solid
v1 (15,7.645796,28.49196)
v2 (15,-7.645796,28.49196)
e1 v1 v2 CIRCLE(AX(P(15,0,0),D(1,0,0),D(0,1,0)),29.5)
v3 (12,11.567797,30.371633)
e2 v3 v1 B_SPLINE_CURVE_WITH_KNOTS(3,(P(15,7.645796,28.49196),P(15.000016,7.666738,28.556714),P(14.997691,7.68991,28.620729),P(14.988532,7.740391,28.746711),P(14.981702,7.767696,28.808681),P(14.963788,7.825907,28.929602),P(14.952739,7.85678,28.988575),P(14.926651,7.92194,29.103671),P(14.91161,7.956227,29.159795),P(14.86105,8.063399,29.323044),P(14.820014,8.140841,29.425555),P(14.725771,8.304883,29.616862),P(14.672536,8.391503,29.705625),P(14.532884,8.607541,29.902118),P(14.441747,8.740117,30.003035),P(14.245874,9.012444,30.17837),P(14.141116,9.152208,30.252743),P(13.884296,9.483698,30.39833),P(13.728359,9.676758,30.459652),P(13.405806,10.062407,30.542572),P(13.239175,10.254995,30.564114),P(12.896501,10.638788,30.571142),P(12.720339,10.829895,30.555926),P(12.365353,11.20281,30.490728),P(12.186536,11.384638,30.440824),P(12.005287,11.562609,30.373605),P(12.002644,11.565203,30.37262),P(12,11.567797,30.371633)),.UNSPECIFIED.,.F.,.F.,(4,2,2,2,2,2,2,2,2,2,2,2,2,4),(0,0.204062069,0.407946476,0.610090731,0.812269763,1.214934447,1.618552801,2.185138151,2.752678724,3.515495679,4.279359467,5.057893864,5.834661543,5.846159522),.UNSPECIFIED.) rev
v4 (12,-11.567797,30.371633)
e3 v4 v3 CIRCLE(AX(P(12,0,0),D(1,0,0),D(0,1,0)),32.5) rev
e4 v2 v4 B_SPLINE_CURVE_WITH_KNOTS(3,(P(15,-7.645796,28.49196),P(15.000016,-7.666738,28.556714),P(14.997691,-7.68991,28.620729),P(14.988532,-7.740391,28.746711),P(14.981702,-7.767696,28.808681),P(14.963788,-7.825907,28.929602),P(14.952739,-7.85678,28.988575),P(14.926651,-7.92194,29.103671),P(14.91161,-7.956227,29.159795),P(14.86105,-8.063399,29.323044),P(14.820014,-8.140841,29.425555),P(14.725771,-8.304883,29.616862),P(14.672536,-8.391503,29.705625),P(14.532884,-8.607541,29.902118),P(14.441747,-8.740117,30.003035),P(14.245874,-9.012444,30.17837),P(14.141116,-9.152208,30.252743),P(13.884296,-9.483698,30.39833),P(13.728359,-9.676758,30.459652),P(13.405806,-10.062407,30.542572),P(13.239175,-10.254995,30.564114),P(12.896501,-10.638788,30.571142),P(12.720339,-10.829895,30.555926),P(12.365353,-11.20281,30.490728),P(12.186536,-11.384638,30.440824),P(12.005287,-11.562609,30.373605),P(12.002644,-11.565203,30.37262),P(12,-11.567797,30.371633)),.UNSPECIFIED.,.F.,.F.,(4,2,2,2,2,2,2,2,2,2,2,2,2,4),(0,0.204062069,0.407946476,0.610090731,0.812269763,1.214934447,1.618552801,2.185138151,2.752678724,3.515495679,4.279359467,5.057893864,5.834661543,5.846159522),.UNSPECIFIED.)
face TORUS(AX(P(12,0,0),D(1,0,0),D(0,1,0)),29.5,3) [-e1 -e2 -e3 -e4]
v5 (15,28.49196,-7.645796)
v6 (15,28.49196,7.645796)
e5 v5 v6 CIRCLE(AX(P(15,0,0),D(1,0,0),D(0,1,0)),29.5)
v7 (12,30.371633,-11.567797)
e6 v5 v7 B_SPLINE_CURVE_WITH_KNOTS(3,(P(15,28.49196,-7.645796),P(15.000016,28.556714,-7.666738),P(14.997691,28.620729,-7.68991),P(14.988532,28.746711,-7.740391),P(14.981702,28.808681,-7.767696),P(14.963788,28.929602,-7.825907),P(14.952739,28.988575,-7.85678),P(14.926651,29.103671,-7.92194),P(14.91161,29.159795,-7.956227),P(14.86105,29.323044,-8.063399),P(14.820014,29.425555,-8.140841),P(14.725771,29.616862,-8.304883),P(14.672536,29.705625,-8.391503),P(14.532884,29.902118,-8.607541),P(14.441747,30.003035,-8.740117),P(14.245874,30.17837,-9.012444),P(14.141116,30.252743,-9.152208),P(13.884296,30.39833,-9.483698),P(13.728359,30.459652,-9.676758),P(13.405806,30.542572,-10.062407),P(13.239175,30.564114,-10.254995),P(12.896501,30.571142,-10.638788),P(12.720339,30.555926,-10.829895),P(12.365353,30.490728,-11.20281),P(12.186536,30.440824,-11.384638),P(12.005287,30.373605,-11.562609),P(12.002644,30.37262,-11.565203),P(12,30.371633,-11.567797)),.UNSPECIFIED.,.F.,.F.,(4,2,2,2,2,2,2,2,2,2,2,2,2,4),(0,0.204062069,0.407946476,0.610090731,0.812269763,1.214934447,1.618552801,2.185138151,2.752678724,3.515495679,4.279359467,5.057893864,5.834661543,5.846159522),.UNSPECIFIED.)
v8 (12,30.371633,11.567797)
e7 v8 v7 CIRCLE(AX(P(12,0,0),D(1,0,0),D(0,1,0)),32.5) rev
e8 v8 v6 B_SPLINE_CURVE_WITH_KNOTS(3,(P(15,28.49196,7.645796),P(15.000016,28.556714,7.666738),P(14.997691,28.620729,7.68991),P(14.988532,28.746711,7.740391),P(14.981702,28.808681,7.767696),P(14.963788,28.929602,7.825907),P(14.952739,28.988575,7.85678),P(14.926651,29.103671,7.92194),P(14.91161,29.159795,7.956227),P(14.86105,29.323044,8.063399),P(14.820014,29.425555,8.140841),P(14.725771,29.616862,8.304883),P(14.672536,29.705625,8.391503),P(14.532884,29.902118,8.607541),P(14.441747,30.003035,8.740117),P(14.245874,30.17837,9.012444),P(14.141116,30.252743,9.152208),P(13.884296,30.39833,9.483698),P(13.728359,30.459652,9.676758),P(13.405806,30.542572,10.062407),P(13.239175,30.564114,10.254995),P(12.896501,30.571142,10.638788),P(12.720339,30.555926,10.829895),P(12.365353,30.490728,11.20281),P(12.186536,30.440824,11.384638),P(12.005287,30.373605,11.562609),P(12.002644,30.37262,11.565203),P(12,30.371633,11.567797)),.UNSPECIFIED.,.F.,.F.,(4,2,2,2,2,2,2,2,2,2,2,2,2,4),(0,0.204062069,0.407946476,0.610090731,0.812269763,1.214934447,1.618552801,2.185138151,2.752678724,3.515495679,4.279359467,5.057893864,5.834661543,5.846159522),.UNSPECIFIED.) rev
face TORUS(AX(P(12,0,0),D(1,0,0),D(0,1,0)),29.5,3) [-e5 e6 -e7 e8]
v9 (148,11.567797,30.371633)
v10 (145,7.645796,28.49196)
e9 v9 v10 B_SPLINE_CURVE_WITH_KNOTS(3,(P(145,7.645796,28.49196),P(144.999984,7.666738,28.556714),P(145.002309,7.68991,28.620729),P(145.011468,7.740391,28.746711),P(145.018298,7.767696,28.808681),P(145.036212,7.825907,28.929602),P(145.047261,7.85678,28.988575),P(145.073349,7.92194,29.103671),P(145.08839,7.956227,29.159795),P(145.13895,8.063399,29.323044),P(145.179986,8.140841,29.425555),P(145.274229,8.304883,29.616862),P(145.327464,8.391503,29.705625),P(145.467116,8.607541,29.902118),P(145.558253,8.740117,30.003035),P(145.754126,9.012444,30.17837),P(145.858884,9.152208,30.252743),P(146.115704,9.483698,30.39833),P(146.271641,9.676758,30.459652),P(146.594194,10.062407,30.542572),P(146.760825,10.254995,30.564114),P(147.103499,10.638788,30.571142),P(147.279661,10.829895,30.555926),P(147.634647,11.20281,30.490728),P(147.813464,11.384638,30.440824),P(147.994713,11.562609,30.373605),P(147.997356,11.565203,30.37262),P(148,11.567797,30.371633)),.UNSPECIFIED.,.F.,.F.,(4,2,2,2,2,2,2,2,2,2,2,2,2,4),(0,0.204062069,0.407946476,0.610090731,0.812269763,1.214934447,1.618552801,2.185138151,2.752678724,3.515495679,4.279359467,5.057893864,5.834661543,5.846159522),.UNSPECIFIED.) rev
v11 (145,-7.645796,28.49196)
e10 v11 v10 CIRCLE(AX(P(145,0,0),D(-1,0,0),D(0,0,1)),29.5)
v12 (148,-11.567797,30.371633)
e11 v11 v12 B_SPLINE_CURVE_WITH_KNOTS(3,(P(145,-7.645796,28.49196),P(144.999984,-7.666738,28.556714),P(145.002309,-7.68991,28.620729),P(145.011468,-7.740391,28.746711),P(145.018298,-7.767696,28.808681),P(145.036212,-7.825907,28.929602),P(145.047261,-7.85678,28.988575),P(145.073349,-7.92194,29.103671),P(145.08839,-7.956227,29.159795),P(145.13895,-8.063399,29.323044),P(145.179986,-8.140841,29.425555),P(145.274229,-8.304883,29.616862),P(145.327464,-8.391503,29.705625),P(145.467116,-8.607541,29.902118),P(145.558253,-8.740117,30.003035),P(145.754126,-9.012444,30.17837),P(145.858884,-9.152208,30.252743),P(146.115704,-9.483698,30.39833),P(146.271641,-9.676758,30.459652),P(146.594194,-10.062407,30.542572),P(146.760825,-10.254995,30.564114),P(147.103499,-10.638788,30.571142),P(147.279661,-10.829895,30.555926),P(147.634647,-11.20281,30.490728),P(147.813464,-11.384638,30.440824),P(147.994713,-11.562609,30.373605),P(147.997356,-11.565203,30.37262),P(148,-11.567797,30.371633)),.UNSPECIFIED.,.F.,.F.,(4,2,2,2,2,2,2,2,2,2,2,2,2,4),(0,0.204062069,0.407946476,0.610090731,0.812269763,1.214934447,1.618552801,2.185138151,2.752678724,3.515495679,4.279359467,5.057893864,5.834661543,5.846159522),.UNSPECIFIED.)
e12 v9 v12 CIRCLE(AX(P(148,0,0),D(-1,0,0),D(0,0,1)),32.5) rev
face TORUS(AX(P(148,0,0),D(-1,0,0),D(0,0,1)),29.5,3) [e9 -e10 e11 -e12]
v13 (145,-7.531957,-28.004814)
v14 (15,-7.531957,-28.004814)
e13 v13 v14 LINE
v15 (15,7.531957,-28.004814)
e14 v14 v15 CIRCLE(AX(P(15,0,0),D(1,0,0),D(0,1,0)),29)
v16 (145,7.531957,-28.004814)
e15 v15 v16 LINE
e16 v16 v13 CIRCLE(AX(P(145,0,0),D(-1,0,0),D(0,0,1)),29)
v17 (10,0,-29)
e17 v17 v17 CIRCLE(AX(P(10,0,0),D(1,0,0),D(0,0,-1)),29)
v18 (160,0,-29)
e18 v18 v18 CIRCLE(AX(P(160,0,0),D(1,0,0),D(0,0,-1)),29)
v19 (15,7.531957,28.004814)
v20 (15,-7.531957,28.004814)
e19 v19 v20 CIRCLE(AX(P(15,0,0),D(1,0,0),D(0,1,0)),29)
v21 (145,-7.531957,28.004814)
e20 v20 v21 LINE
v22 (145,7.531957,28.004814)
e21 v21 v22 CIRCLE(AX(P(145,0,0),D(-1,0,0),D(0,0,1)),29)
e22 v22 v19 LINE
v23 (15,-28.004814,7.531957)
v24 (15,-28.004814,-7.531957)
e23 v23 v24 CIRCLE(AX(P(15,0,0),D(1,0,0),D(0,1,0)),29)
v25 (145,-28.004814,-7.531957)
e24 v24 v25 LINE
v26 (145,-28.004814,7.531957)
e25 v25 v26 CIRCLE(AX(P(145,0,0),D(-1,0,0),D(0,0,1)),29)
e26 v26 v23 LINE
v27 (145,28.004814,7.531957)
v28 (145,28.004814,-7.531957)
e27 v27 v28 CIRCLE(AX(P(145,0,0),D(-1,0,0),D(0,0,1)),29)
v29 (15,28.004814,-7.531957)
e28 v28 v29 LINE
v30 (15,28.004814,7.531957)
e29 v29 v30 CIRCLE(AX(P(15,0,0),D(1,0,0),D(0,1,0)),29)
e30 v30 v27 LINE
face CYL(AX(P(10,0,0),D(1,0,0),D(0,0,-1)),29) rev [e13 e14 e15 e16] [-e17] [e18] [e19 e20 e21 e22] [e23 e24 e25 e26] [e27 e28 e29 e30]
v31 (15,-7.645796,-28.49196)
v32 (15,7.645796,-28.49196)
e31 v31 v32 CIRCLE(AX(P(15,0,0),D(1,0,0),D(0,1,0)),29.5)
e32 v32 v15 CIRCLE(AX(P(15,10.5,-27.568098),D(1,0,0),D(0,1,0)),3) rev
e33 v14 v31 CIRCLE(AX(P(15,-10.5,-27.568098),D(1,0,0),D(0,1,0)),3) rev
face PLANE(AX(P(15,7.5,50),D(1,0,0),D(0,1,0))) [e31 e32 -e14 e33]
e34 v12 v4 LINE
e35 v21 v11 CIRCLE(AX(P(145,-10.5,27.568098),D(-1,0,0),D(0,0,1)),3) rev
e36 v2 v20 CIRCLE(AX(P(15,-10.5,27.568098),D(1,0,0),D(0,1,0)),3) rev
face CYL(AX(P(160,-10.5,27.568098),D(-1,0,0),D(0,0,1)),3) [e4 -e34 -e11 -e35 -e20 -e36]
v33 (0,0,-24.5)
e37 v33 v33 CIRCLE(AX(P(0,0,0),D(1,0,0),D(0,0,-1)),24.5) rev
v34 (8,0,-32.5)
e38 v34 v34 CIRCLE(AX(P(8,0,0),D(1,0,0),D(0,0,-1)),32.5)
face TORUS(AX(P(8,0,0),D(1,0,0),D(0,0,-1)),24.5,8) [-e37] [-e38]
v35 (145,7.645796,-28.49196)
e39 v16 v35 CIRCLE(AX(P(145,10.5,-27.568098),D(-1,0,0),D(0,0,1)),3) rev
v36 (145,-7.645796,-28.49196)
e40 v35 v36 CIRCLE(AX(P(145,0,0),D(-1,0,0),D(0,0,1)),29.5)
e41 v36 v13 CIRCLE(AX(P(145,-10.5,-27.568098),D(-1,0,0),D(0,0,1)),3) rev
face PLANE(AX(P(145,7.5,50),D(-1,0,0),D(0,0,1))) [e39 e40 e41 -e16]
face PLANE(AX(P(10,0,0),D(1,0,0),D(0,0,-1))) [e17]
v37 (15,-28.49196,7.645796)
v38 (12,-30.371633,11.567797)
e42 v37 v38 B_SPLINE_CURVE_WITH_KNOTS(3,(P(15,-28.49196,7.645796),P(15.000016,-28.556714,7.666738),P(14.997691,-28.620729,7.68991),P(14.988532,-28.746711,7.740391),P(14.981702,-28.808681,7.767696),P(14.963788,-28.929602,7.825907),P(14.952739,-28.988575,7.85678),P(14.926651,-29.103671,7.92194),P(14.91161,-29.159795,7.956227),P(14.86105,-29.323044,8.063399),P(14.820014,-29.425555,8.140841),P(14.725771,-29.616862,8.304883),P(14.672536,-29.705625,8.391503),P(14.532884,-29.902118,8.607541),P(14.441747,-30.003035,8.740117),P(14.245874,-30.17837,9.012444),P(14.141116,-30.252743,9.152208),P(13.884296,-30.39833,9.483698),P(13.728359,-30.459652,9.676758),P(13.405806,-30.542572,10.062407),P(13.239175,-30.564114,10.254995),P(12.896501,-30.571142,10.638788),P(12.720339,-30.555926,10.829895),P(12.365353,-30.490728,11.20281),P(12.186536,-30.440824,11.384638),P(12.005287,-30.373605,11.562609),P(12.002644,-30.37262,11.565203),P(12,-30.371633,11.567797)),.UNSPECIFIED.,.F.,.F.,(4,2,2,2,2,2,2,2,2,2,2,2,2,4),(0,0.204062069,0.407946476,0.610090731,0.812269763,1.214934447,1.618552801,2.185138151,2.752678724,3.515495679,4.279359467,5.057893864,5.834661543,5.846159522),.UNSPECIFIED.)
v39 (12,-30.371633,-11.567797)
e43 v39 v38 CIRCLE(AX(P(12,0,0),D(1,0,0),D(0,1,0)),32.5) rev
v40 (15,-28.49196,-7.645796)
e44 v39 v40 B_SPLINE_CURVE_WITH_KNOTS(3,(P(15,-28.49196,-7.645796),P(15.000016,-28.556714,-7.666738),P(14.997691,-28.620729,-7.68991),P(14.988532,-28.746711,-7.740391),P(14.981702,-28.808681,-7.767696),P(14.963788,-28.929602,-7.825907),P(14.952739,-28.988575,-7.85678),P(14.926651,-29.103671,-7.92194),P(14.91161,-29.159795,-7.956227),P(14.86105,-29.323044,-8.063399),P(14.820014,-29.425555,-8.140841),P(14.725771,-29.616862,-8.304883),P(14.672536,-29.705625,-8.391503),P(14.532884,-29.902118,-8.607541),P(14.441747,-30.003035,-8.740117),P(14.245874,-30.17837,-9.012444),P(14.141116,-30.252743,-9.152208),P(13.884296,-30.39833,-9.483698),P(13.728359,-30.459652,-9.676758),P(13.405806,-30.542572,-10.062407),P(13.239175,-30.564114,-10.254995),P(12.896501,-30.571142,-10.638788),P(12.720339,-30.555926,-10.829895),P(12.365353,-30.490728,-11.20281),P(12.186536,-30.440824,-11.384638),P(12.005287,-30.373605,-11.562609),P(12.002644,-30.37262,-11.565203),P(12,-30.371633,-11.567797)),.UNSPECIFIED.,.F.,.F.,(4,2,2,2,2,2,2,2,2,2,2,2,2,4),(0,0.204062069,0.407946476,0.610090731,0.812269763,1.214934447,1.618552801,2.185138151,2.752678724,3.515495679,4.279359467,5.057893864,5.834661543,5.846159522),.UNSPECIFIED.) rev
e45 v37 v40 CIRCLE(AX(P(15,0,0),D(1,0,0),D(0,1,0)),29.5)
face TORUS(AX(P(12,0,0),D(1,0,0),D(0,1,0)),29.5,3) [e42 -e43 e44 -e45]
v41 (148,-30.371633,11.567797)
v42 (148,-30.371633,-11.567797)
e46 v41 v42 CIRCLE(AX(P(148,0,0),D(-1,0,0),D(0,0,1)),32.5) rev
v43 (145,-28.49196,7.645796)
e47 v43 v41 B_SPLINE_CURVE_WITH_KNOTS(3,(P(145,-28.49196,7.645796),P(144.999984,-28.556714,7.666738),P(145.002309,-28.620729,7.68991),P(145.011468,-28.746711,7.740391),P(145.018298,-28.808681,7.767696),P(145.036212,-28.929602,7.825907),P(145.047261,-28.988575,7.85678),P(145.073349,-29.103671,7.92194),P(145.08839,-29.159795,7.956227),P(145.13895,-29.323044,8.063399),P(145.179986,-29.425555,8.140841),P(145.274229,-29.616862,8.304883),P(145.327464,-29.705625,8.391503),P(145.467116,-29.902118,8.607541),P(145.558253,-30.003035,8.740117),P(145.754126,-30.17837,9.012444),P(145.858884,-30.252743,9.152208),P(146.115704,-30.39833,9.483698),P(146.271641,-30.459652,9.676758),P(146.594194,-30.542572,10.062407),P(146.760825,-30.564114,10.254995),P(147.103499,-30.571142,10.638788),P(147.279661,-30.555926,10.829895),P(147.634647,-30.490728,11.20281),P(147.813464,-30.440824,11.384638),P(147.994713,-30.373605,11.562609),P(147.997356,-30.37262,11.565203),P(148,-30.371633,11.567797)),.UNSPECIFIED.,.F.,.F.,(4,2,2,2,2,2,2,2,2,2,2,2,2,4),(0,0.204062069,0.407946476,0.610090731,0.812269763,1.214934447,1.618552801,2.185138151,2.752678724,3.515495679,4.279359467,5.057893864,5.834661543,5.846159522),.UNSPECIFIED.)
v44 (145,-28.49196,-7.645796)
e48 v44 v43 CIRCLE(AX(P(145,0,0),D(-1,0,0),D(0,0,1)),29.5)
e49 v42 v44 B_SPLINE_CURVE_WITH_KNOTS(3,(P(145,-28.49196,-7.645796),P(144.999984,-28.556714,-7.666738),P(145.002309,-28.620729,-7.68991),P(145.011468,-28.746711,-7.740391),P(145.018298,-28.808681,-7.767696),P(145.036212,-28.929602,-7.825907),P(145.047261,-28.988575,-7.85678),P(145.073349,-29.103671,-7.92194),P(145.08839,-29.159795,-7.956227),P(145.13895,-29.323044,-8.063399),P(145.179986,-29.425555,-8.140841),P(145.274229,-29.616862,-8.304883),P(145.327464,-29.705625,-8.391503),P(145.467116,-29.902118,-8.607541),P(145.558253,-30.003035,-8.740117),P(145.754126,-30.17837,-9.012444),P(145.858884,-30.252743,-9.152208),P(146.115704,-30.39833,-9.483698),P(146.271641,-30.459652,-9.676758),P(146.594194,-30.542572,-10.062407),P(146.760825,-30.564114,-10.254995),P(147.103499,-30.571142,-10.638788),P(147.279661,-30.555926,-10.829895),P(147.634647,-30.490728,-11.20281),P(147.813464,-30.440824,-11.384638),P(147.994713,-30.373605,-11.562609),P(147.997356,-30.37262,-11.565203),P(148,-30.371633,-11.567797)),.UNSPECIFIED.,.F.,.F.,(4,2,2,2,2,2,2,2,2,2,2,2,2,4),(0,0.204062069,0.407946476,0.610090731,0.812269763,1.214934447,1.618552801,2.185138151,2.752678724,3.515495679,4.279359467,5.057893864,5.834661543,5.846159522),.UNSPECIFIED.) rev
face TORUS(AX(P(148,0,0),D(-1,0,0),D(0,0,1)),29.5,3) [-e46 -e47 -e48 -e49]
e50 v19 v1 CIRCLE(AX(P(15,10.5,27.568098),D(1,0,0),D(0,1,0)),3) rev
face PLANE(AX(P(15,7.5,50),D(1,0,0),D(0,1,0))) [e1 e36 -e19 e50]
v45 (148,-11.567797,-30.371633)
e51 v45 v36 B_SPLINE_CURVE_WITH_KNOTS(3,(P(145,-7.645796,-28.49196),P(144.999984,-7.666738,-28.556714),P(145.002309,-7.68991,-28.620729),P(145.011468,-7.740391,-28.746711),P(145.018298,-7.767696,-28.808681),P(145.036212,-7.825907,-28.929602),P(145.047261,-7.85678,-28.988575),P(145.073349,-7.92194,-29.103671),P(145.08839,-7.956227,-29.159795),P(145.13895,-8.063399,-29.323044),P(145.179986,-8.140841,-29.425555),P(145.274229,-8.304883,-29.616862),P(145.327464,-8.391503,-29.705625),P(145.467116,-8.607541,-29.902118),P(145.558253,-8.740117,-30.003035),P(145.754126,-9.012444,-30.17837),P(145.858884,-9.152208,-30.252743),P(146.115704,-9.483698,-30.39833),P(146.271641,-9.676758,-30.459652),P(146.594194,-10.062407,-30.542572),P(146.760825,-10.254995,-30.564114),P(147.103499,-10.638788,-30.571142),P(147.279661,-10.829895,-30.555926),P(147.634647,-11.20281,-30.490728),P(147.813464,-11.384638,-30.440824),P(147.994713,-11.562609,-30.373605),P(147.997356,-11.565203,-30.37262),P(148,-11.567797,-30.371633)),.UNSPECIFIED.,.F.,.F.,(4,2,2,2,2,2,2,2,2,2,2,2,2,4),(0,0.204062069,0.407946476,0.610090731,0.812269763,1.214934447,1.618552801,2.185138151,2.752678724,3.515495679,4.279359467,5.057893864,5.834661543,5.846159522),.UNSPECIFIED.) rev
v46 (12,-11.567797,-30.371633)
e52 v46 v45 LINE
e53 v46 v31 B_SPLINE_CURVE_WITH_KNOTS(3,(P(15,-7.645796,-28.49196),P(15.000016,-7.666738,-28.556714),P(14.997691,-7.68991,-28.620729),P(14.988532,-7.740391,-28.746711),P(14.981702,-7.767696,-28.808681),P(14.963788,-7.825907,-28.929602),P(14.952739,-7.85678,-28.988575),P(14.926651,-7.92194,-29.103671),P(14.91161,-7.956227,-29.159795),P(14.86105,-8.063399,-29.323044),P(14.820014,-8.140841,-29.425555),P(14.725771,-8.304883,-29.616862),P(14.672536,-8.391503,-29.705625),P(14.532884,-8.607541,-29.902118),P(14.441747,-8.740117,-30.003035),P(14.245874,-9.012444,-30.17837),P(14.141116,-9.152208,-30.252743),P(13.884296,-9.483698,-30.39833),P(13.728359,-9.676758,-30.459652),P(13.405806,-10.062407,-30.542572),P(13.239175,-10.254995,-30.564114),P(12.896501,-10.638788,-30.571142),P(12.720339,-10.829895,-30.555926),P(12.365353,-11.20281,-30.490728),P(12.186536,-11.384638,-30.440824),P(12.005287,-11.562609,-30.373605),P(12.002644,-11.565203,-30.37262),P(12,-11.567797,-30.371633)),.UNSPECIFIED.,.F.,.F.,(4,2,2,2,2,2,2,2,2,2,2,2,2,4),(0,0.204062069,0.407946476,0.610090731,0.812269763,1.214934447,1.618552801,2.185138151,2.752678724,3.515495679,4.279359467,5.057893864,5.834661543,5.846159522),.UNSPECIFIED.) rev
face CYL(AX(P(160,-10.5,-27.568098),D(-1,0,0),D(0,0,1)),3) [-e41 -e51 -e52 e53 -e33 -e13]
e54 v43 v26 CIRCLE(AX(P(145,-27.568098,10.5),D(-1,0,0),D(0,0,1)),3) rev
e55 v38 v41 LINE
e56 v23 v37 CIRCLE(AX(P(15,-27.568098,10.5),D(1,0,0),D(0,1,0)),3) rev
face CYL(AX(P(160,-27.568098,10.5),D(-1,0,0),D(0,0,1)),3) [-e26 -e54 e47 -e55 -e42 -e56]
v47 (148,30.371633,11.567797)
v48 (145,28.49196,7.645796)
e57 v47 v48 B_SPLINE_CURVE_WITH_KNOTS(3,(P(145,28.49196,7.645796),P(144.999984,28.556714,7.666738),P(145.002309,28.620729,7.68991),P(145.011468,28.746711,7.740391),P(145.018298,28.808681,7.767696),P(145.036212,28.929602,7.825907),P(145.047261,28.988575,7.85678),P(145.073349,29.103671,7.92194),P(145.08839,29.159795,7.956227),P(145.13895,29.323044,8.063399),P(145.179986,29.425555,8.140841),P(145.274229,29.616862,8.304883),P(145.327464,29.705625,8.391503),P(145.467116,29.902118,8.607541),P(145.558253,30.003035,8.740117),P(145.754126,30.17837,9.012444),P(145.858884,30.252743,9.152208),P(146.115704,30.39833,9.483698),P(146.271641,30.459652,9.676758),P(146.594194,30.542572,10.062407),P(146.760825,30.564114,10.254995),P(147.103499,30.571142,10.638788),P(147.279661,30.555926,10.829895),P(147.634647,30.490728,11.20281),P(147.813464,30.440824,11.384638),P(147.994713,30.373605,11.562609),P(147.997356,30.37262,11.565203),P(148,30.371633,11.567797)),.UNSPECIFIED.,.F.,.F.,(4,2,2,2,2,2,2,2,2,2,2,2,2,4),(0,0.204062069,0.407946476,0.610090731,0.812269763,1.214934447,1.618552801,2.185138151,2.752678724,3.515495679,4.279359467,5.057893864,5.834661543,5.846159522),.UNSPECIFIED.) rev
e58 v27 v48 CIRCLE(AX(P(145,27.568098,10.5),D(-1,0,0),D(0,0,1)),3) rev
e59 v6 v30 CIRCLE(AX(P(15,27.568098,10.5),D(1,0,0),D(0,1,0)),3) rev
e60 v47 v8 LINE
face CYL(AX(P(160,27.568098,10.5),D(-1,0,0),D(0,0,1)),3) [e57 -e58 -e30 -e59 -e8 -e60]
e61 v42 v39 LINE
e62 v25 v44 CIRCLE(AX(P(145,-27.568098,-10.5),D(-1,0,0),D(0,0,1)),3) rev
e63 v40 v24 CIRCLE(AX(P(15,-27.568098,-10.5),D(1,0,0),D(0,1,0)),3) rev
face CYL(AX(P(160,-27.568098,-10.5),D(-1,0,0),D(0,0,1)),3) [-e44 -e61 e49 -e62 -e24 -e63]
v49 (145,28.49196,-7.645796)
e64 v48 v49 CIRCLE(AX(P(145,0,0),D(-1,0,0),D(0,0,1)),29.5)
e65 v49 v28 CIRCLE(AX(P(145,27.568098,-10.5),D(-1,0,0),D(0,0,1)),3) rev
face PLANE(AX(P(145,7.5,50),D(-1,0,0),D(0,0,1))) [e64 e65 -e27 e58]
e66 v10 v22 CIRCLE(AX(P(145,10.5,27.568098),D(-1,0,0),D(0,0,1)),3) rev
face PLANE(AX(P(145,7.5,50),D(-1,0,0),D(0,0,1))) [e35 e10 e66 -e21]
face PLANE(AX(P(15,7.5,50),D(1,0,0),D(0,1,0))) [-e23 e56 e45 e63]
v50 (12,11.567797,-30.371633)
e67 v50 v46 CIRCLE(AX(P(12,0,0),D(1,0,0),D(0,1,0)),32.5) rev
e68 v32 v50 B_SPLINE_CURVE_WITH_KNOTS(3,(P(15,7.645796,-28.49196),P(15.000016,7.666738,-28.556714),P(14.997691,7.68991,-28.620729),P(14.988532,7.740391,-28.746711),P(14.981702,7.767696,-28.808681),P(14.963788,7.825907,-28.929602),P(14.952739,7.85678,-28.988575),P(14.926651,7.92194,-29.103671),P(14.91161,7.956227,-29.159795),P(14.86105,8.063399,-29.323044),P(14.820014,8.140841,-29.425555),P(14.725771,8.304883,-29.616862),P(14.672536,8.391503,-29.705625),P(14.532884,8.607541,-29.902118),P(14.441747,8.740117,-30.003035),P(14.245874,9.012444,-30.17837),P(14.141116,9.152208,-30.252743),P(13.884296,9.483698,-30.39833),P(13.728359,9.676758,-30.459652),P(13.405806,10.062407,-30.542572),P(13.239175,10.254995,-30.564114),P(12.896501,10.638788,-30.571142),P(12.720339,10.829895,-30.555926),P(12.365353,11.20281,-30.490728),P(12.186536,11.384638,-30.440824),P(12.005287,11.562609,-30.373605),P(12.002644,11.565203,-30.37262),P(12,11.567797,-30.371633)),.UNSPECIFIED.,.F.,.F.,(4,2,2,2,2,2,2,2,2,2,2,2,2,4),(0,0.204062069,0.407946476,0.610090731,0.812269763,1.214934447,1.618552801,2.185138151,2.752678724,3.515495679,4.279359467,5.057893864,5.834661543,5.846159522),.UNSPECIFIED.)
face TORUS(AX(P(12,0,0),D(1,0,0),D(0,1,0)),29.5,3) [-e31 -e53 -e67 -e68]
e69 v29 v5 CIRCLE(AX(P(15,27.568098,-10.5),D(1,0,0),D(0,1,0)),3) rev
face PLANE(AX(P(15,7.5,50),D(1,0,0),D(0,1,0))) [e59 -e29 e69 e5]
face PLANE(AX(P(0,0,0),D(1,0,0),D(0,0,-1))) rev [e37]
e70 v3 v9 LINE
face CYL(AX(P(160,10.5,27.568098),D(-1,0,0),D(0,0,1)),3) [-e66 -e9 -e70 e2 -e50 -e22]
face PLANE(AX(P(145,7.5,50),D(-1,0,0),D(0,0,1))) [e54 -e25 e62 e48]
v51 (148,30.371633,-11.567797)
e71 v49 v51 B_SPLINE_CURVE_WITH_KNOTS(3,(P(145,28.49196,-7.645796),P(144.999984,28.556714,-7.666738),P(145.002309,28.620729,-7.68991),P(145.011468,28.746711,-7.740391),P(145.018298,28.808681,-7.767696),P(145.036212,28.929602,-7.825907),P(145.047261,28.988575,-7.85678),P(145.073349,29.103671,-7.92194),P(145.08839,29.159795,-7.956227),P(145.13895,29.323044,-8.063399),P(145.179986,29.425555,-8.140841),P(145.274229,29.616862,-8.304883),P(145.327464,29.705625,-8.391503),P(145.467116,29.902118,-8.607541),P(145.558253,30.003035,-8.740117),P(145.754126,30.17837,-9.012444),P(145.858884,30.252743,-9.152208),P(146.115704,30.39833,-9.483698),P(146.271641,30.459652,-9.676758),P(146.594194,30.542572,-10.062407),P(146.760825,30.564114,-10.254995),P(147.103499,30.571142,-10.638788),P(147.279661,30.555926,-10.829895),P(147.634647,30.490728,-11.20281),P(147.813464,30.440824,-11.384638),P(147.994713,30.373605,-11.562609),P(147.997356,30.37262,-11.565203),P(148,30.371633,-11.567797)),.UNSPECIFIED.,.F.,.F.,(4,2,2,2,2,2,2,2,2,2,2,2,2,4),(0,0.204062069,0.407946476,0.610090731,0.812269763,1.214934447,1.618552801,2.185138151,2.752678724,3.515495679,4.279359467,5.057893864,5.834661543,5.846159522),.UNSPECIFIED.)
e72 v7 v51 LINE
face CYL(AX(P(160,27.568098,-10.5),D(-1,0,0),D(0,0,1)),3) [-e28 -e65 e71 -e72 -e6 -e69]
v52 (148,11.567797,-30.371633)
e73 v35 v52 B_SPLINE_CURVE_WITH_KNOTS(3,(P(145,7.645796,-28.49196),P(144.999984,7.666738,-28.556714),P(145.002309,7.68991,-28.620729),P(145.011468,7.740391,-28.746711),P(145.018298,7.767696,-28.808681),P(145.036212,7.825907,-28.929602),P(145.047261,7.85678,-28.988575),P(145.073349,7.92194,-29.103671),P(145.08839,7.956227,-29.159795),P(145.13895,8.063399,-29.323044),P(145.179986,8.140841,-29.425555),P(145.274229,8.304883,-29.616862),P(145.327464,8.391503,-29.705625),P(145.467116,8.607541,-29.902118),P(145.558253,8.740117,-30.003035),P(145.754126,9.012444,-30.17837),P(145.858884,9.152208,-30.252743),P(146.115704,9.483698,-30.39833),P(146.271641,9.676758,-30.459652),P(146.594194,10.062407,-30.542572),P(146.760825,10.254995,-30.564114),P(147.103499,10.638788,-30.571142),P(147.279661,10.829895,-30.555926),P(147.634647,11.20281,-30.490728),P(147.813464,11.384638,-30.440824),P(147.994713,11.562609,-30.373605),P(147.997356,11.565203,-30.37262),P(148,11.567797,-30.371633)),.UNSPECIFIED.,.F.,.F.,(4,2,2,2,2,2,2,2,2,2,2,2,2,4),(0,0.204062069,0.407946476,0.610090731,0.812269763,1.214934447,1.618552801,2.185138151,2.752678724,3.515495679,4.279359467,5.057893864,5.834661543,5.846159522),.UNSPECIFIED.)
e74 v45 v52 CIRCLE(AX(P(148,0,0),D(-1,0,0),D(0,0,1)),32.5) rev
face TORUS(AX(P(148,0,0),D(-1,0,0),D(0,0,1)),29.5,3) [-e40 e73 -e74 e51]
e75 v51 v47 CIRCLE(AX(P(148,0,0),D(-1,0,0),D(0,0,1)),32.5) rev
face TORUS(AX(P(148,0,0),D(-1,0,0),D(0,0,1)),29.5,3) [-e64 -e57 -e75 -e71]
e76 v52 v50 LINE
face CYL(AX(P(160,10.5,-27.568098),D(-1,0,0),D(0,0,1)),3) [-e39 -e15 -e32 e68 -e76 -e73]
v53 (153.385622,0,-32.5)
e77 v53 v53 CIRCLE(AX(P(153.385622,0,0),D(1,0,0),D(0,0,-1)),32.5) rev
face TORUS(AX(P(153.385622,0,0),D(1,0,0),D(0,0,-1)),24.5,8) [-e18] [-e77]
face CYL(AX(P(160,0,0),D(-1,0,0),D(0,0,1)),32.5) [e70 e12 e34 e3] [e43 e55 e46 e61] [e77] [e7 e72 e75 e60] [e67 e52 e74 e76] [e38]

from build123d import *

# Parameters (mm, degrees)
SKETCH2_R               = 32.5
BOSS_EXTRUDE1_DEPTH     = 160
CUT_EXTRUDE2_DEPTH      = 50
CUT_EXTRUDE2_DEPTH_BACK = 50
SKETCH4_W               = 130
SKETCH4_H               = 15
CUT_EXTRUDE3_DEPTH      = 50
CUT_EXTRUDE3_DEPTH_BACK = 50
SKETCH5_W               = 130
SKETCH5_H               = 15
FILLET2_START           = 11.9999999
FILLET2_DEPTH           = 136.0000002
SKETCH6_R               = 29
CUT_EXTRUDE4_DEPTH      = 160
FILLET3_R               = 8


with BuildPart() as part:
    # Sketch2 → Boss-Extrude1 (new body)
    with BuildSketch(Plane(origin=(0, 0, 0), x_dir=(0, 0, -1), z_dir=(1, 0, 0))):
        Circle(SKETCH2_R)
    extrude(amount=BOSS_EXTRUDE1_DEPTH)

    # Sketch4 → Cut-Extrude2 (cut, two sides: drawn at the far end of the back side and taken through both)
    with BuildSketch(Plane.XY.offset(-CUT_EXTRUDE2_DEPTH_BACK)):
        with Locations((80, 0)):
            Rectangle(SKETCH4_W, SKETCH4_H)
    extrude(amount=CUT_EXTRUDE2_DEPTH + CUT_EXTRUDE2_DEPTH_BACK, mode=Mode.SUBTRACT)

    # Sketch5 → Cut-Extrude3 (cut, two sides: drawn at the far end of the back side and taken through both)
    with BuildSketch(Plane(origin=(0, 0, 0), x_dir=(1, 0, 0), z_dir=(0, 1, 0)).offset(-CUT_EXTRUDE3_DEPTH_BACK)):
        with Locations((80, 0)):
            Rectangle(SKETCH5_W, SKETCH5_H)
    extrude(amount=CUT_EXTRUDE3_DEPTH + CUT_EXTRUDE3_DEPTH_BACK, mode=Mode.SUBTRACT)

    # Fillet2: read off the stored shape, not the designer's step
    # Fillet2 outline → Fillet2 (cut)
    with BuildSketch(Plane.YZ.offset(FILLET2_START)):
        with BuildLine():
            ThreePointArc((-30.371632844, 11.56779661), (-32.5, 0), (-30.371632844, -11.56779661))
            ThreePointArc((-30.371632844, -11.56779661), (-30.038258413, -8.79755908), (-27.568097504, -7.5))
            Line((-27.568097504, -7.5), (-7.5, -7.5))
            Line((-7.5, -7.5), (-7.5, -27.568097504))
            ThreePointArc((-7.5, -27.568097504), (-8.79755908, -30.038258413), (-11.56779661, -30.371632844))
            ThreePointArc((-11.56779661, -30.371632844), (0, -32.5), (11.56779661, -30.371632844))
            ThreePointArc((11.56779661, -30.371632844), (8.79755908, -30.038258413), (7.5, -27.568097504))
            Line((7.5, -27.568097504), (7.5, -7.5))
            Line((7.5, -7.5), (27.568097504, -7.5))
            ThreePointArc((27.568097504, -7.5), (30.038258413, -8.79755908), (30.371632844, -11.56779661))
            ThreePointArc((30.371632844, -11.56779661), (32.5, 0), (30.371632844, 11.56779661))
            ThreePointArc((30.371632844, 11.56779661), (30.038258413, 8.79755908), (27.568097504, 7.5))
            Line((27.568097504, 7.5), (7.5, 7.5))
            Line((7.5, 7.5), (7.5, 27.568097504))
            ThreePointArc((7.5, 27.568097504), (8.79755908, 30.038258413), (11.56779661, 30.371632844))
            ThreePointArc((11.56779661, 30.371632844), (0, 32.5), (-11.56779661, 30.371632844))
            ThreePointArc((-11.56779661, 30.371632844), (-8.79755908, 30.038258413), (-7.5, 27.568097504))
            Line((-7.5, 27.568097504), (-7.5, 7.5))
            Line((-7.5, 7.5), (-27.568097504, 7.5))
            ThreePointArc((-27.568097504, 7.5), (-30.038258413, 8.79755908), (-30.371632844, 11.56779661))
        make_face()
    extrude(amount=FILLET2_DEPTH, mode=Mode.SUBTRACT)

    # Fillet2 2 outline → Fillet2 2 (revolve)
    with BuildSketch(Plane.YX):
        with BuildLine():
            Line((0, 148.0000001), (0, 145))
            Line((0, 145), (29.5, 145))
            ThreePointArc((29.5, 145), (31.621320344, 145.878679656), (32.5, 148))
            Line((32.5, 148), (0, 148.0000001))
        make_face()
        with BuildLine():
            Line((29.5, 15), (0, 15))
            Line((0, 15), (0, 11.9999999))
            Line((0, 11.9999999), (32.5, 12))
            ThreePointArc((32.5, 12), (31.621320344, 14.121320344), (29.5, 15))
        make_face()
    revolve(axis=Axis((0, 0, 0), (1, 0, 0)))

    # Sketch6 → Cut-Extrude4 (cut)
    with BuildSketch(Plane(origin=(170, 0, 0), x_dir=(0, 0, -1), z_dir=(1, 0, 0))):
        Circle(SKETCH6_R)
    extrude(amount=-CUT_EXTRUDE4_DEPTH, mode=Mode.SUBTRACT)

    # Fillet3
    # the kernel refuses this fillet: 8 mm, written as the material it takes off along each edge
    with BuildSketch(Plane(origin=(0, 0, 0), x_dir=(0, 0, -1), z_dir=(0, -1, 0))) as fillet3_piece_1:
        with BuildLine():
            CenterArc((32.5 - FILLET3_R, FILLET3_R), FILLET3_R, 270, 90)
            Line((32.5 - FILLET3_R, 0), (32.5 - FILLET3_R, -FILLET3_R * 0.02))
            Line((32.5 - FILLET3_R, -FILLET3_R * 0.02), (32.5 + FILLET3_R * 0.02, -FILLET3_R * 0.02))
            Line((32.5 + FILLET3_R * 0.02, -FILLET3_R * 0.02), (32.5 + FILLET3_R * 0.02, FILLET3_R))
            Line((32.5 + FILLET3_R * 0.02, FILLET3_R), (32.5, FILLET3_R))
        make_face()
    revolve(axis=Axis((0, 0, 0), (1, 0, 0)), mode=Mode.SUBTRACT)
    with BuildSketch(Plane(origin=(160, 0, 0), x_dir=(0, 0, -1), z_dir=(0, -1, 0))) as fillet3_piece_2:
        with BuildLine():
            CenterArc((24.5, -6.614378278), FILLET3_R, 0, 55.771133672)
            Line((29, 0), (29.09, 0.132287566))
            ThreePointArc((29.09, 0.132287566), (30.75, 0.16), (32.5, 0.16))
            Line((32.5, 0.16), (32.66, 0))
            Line((32.66, 0), (32.66, -6.614378278))
            Line((32.66, -6.614378278), (32.5, -6.614378278))
        make_face()
    revolve(axis=Axis((160, 0, 0), (1, 0, 0)), mode=Mode.SUBTRACT)


solid = part.part
